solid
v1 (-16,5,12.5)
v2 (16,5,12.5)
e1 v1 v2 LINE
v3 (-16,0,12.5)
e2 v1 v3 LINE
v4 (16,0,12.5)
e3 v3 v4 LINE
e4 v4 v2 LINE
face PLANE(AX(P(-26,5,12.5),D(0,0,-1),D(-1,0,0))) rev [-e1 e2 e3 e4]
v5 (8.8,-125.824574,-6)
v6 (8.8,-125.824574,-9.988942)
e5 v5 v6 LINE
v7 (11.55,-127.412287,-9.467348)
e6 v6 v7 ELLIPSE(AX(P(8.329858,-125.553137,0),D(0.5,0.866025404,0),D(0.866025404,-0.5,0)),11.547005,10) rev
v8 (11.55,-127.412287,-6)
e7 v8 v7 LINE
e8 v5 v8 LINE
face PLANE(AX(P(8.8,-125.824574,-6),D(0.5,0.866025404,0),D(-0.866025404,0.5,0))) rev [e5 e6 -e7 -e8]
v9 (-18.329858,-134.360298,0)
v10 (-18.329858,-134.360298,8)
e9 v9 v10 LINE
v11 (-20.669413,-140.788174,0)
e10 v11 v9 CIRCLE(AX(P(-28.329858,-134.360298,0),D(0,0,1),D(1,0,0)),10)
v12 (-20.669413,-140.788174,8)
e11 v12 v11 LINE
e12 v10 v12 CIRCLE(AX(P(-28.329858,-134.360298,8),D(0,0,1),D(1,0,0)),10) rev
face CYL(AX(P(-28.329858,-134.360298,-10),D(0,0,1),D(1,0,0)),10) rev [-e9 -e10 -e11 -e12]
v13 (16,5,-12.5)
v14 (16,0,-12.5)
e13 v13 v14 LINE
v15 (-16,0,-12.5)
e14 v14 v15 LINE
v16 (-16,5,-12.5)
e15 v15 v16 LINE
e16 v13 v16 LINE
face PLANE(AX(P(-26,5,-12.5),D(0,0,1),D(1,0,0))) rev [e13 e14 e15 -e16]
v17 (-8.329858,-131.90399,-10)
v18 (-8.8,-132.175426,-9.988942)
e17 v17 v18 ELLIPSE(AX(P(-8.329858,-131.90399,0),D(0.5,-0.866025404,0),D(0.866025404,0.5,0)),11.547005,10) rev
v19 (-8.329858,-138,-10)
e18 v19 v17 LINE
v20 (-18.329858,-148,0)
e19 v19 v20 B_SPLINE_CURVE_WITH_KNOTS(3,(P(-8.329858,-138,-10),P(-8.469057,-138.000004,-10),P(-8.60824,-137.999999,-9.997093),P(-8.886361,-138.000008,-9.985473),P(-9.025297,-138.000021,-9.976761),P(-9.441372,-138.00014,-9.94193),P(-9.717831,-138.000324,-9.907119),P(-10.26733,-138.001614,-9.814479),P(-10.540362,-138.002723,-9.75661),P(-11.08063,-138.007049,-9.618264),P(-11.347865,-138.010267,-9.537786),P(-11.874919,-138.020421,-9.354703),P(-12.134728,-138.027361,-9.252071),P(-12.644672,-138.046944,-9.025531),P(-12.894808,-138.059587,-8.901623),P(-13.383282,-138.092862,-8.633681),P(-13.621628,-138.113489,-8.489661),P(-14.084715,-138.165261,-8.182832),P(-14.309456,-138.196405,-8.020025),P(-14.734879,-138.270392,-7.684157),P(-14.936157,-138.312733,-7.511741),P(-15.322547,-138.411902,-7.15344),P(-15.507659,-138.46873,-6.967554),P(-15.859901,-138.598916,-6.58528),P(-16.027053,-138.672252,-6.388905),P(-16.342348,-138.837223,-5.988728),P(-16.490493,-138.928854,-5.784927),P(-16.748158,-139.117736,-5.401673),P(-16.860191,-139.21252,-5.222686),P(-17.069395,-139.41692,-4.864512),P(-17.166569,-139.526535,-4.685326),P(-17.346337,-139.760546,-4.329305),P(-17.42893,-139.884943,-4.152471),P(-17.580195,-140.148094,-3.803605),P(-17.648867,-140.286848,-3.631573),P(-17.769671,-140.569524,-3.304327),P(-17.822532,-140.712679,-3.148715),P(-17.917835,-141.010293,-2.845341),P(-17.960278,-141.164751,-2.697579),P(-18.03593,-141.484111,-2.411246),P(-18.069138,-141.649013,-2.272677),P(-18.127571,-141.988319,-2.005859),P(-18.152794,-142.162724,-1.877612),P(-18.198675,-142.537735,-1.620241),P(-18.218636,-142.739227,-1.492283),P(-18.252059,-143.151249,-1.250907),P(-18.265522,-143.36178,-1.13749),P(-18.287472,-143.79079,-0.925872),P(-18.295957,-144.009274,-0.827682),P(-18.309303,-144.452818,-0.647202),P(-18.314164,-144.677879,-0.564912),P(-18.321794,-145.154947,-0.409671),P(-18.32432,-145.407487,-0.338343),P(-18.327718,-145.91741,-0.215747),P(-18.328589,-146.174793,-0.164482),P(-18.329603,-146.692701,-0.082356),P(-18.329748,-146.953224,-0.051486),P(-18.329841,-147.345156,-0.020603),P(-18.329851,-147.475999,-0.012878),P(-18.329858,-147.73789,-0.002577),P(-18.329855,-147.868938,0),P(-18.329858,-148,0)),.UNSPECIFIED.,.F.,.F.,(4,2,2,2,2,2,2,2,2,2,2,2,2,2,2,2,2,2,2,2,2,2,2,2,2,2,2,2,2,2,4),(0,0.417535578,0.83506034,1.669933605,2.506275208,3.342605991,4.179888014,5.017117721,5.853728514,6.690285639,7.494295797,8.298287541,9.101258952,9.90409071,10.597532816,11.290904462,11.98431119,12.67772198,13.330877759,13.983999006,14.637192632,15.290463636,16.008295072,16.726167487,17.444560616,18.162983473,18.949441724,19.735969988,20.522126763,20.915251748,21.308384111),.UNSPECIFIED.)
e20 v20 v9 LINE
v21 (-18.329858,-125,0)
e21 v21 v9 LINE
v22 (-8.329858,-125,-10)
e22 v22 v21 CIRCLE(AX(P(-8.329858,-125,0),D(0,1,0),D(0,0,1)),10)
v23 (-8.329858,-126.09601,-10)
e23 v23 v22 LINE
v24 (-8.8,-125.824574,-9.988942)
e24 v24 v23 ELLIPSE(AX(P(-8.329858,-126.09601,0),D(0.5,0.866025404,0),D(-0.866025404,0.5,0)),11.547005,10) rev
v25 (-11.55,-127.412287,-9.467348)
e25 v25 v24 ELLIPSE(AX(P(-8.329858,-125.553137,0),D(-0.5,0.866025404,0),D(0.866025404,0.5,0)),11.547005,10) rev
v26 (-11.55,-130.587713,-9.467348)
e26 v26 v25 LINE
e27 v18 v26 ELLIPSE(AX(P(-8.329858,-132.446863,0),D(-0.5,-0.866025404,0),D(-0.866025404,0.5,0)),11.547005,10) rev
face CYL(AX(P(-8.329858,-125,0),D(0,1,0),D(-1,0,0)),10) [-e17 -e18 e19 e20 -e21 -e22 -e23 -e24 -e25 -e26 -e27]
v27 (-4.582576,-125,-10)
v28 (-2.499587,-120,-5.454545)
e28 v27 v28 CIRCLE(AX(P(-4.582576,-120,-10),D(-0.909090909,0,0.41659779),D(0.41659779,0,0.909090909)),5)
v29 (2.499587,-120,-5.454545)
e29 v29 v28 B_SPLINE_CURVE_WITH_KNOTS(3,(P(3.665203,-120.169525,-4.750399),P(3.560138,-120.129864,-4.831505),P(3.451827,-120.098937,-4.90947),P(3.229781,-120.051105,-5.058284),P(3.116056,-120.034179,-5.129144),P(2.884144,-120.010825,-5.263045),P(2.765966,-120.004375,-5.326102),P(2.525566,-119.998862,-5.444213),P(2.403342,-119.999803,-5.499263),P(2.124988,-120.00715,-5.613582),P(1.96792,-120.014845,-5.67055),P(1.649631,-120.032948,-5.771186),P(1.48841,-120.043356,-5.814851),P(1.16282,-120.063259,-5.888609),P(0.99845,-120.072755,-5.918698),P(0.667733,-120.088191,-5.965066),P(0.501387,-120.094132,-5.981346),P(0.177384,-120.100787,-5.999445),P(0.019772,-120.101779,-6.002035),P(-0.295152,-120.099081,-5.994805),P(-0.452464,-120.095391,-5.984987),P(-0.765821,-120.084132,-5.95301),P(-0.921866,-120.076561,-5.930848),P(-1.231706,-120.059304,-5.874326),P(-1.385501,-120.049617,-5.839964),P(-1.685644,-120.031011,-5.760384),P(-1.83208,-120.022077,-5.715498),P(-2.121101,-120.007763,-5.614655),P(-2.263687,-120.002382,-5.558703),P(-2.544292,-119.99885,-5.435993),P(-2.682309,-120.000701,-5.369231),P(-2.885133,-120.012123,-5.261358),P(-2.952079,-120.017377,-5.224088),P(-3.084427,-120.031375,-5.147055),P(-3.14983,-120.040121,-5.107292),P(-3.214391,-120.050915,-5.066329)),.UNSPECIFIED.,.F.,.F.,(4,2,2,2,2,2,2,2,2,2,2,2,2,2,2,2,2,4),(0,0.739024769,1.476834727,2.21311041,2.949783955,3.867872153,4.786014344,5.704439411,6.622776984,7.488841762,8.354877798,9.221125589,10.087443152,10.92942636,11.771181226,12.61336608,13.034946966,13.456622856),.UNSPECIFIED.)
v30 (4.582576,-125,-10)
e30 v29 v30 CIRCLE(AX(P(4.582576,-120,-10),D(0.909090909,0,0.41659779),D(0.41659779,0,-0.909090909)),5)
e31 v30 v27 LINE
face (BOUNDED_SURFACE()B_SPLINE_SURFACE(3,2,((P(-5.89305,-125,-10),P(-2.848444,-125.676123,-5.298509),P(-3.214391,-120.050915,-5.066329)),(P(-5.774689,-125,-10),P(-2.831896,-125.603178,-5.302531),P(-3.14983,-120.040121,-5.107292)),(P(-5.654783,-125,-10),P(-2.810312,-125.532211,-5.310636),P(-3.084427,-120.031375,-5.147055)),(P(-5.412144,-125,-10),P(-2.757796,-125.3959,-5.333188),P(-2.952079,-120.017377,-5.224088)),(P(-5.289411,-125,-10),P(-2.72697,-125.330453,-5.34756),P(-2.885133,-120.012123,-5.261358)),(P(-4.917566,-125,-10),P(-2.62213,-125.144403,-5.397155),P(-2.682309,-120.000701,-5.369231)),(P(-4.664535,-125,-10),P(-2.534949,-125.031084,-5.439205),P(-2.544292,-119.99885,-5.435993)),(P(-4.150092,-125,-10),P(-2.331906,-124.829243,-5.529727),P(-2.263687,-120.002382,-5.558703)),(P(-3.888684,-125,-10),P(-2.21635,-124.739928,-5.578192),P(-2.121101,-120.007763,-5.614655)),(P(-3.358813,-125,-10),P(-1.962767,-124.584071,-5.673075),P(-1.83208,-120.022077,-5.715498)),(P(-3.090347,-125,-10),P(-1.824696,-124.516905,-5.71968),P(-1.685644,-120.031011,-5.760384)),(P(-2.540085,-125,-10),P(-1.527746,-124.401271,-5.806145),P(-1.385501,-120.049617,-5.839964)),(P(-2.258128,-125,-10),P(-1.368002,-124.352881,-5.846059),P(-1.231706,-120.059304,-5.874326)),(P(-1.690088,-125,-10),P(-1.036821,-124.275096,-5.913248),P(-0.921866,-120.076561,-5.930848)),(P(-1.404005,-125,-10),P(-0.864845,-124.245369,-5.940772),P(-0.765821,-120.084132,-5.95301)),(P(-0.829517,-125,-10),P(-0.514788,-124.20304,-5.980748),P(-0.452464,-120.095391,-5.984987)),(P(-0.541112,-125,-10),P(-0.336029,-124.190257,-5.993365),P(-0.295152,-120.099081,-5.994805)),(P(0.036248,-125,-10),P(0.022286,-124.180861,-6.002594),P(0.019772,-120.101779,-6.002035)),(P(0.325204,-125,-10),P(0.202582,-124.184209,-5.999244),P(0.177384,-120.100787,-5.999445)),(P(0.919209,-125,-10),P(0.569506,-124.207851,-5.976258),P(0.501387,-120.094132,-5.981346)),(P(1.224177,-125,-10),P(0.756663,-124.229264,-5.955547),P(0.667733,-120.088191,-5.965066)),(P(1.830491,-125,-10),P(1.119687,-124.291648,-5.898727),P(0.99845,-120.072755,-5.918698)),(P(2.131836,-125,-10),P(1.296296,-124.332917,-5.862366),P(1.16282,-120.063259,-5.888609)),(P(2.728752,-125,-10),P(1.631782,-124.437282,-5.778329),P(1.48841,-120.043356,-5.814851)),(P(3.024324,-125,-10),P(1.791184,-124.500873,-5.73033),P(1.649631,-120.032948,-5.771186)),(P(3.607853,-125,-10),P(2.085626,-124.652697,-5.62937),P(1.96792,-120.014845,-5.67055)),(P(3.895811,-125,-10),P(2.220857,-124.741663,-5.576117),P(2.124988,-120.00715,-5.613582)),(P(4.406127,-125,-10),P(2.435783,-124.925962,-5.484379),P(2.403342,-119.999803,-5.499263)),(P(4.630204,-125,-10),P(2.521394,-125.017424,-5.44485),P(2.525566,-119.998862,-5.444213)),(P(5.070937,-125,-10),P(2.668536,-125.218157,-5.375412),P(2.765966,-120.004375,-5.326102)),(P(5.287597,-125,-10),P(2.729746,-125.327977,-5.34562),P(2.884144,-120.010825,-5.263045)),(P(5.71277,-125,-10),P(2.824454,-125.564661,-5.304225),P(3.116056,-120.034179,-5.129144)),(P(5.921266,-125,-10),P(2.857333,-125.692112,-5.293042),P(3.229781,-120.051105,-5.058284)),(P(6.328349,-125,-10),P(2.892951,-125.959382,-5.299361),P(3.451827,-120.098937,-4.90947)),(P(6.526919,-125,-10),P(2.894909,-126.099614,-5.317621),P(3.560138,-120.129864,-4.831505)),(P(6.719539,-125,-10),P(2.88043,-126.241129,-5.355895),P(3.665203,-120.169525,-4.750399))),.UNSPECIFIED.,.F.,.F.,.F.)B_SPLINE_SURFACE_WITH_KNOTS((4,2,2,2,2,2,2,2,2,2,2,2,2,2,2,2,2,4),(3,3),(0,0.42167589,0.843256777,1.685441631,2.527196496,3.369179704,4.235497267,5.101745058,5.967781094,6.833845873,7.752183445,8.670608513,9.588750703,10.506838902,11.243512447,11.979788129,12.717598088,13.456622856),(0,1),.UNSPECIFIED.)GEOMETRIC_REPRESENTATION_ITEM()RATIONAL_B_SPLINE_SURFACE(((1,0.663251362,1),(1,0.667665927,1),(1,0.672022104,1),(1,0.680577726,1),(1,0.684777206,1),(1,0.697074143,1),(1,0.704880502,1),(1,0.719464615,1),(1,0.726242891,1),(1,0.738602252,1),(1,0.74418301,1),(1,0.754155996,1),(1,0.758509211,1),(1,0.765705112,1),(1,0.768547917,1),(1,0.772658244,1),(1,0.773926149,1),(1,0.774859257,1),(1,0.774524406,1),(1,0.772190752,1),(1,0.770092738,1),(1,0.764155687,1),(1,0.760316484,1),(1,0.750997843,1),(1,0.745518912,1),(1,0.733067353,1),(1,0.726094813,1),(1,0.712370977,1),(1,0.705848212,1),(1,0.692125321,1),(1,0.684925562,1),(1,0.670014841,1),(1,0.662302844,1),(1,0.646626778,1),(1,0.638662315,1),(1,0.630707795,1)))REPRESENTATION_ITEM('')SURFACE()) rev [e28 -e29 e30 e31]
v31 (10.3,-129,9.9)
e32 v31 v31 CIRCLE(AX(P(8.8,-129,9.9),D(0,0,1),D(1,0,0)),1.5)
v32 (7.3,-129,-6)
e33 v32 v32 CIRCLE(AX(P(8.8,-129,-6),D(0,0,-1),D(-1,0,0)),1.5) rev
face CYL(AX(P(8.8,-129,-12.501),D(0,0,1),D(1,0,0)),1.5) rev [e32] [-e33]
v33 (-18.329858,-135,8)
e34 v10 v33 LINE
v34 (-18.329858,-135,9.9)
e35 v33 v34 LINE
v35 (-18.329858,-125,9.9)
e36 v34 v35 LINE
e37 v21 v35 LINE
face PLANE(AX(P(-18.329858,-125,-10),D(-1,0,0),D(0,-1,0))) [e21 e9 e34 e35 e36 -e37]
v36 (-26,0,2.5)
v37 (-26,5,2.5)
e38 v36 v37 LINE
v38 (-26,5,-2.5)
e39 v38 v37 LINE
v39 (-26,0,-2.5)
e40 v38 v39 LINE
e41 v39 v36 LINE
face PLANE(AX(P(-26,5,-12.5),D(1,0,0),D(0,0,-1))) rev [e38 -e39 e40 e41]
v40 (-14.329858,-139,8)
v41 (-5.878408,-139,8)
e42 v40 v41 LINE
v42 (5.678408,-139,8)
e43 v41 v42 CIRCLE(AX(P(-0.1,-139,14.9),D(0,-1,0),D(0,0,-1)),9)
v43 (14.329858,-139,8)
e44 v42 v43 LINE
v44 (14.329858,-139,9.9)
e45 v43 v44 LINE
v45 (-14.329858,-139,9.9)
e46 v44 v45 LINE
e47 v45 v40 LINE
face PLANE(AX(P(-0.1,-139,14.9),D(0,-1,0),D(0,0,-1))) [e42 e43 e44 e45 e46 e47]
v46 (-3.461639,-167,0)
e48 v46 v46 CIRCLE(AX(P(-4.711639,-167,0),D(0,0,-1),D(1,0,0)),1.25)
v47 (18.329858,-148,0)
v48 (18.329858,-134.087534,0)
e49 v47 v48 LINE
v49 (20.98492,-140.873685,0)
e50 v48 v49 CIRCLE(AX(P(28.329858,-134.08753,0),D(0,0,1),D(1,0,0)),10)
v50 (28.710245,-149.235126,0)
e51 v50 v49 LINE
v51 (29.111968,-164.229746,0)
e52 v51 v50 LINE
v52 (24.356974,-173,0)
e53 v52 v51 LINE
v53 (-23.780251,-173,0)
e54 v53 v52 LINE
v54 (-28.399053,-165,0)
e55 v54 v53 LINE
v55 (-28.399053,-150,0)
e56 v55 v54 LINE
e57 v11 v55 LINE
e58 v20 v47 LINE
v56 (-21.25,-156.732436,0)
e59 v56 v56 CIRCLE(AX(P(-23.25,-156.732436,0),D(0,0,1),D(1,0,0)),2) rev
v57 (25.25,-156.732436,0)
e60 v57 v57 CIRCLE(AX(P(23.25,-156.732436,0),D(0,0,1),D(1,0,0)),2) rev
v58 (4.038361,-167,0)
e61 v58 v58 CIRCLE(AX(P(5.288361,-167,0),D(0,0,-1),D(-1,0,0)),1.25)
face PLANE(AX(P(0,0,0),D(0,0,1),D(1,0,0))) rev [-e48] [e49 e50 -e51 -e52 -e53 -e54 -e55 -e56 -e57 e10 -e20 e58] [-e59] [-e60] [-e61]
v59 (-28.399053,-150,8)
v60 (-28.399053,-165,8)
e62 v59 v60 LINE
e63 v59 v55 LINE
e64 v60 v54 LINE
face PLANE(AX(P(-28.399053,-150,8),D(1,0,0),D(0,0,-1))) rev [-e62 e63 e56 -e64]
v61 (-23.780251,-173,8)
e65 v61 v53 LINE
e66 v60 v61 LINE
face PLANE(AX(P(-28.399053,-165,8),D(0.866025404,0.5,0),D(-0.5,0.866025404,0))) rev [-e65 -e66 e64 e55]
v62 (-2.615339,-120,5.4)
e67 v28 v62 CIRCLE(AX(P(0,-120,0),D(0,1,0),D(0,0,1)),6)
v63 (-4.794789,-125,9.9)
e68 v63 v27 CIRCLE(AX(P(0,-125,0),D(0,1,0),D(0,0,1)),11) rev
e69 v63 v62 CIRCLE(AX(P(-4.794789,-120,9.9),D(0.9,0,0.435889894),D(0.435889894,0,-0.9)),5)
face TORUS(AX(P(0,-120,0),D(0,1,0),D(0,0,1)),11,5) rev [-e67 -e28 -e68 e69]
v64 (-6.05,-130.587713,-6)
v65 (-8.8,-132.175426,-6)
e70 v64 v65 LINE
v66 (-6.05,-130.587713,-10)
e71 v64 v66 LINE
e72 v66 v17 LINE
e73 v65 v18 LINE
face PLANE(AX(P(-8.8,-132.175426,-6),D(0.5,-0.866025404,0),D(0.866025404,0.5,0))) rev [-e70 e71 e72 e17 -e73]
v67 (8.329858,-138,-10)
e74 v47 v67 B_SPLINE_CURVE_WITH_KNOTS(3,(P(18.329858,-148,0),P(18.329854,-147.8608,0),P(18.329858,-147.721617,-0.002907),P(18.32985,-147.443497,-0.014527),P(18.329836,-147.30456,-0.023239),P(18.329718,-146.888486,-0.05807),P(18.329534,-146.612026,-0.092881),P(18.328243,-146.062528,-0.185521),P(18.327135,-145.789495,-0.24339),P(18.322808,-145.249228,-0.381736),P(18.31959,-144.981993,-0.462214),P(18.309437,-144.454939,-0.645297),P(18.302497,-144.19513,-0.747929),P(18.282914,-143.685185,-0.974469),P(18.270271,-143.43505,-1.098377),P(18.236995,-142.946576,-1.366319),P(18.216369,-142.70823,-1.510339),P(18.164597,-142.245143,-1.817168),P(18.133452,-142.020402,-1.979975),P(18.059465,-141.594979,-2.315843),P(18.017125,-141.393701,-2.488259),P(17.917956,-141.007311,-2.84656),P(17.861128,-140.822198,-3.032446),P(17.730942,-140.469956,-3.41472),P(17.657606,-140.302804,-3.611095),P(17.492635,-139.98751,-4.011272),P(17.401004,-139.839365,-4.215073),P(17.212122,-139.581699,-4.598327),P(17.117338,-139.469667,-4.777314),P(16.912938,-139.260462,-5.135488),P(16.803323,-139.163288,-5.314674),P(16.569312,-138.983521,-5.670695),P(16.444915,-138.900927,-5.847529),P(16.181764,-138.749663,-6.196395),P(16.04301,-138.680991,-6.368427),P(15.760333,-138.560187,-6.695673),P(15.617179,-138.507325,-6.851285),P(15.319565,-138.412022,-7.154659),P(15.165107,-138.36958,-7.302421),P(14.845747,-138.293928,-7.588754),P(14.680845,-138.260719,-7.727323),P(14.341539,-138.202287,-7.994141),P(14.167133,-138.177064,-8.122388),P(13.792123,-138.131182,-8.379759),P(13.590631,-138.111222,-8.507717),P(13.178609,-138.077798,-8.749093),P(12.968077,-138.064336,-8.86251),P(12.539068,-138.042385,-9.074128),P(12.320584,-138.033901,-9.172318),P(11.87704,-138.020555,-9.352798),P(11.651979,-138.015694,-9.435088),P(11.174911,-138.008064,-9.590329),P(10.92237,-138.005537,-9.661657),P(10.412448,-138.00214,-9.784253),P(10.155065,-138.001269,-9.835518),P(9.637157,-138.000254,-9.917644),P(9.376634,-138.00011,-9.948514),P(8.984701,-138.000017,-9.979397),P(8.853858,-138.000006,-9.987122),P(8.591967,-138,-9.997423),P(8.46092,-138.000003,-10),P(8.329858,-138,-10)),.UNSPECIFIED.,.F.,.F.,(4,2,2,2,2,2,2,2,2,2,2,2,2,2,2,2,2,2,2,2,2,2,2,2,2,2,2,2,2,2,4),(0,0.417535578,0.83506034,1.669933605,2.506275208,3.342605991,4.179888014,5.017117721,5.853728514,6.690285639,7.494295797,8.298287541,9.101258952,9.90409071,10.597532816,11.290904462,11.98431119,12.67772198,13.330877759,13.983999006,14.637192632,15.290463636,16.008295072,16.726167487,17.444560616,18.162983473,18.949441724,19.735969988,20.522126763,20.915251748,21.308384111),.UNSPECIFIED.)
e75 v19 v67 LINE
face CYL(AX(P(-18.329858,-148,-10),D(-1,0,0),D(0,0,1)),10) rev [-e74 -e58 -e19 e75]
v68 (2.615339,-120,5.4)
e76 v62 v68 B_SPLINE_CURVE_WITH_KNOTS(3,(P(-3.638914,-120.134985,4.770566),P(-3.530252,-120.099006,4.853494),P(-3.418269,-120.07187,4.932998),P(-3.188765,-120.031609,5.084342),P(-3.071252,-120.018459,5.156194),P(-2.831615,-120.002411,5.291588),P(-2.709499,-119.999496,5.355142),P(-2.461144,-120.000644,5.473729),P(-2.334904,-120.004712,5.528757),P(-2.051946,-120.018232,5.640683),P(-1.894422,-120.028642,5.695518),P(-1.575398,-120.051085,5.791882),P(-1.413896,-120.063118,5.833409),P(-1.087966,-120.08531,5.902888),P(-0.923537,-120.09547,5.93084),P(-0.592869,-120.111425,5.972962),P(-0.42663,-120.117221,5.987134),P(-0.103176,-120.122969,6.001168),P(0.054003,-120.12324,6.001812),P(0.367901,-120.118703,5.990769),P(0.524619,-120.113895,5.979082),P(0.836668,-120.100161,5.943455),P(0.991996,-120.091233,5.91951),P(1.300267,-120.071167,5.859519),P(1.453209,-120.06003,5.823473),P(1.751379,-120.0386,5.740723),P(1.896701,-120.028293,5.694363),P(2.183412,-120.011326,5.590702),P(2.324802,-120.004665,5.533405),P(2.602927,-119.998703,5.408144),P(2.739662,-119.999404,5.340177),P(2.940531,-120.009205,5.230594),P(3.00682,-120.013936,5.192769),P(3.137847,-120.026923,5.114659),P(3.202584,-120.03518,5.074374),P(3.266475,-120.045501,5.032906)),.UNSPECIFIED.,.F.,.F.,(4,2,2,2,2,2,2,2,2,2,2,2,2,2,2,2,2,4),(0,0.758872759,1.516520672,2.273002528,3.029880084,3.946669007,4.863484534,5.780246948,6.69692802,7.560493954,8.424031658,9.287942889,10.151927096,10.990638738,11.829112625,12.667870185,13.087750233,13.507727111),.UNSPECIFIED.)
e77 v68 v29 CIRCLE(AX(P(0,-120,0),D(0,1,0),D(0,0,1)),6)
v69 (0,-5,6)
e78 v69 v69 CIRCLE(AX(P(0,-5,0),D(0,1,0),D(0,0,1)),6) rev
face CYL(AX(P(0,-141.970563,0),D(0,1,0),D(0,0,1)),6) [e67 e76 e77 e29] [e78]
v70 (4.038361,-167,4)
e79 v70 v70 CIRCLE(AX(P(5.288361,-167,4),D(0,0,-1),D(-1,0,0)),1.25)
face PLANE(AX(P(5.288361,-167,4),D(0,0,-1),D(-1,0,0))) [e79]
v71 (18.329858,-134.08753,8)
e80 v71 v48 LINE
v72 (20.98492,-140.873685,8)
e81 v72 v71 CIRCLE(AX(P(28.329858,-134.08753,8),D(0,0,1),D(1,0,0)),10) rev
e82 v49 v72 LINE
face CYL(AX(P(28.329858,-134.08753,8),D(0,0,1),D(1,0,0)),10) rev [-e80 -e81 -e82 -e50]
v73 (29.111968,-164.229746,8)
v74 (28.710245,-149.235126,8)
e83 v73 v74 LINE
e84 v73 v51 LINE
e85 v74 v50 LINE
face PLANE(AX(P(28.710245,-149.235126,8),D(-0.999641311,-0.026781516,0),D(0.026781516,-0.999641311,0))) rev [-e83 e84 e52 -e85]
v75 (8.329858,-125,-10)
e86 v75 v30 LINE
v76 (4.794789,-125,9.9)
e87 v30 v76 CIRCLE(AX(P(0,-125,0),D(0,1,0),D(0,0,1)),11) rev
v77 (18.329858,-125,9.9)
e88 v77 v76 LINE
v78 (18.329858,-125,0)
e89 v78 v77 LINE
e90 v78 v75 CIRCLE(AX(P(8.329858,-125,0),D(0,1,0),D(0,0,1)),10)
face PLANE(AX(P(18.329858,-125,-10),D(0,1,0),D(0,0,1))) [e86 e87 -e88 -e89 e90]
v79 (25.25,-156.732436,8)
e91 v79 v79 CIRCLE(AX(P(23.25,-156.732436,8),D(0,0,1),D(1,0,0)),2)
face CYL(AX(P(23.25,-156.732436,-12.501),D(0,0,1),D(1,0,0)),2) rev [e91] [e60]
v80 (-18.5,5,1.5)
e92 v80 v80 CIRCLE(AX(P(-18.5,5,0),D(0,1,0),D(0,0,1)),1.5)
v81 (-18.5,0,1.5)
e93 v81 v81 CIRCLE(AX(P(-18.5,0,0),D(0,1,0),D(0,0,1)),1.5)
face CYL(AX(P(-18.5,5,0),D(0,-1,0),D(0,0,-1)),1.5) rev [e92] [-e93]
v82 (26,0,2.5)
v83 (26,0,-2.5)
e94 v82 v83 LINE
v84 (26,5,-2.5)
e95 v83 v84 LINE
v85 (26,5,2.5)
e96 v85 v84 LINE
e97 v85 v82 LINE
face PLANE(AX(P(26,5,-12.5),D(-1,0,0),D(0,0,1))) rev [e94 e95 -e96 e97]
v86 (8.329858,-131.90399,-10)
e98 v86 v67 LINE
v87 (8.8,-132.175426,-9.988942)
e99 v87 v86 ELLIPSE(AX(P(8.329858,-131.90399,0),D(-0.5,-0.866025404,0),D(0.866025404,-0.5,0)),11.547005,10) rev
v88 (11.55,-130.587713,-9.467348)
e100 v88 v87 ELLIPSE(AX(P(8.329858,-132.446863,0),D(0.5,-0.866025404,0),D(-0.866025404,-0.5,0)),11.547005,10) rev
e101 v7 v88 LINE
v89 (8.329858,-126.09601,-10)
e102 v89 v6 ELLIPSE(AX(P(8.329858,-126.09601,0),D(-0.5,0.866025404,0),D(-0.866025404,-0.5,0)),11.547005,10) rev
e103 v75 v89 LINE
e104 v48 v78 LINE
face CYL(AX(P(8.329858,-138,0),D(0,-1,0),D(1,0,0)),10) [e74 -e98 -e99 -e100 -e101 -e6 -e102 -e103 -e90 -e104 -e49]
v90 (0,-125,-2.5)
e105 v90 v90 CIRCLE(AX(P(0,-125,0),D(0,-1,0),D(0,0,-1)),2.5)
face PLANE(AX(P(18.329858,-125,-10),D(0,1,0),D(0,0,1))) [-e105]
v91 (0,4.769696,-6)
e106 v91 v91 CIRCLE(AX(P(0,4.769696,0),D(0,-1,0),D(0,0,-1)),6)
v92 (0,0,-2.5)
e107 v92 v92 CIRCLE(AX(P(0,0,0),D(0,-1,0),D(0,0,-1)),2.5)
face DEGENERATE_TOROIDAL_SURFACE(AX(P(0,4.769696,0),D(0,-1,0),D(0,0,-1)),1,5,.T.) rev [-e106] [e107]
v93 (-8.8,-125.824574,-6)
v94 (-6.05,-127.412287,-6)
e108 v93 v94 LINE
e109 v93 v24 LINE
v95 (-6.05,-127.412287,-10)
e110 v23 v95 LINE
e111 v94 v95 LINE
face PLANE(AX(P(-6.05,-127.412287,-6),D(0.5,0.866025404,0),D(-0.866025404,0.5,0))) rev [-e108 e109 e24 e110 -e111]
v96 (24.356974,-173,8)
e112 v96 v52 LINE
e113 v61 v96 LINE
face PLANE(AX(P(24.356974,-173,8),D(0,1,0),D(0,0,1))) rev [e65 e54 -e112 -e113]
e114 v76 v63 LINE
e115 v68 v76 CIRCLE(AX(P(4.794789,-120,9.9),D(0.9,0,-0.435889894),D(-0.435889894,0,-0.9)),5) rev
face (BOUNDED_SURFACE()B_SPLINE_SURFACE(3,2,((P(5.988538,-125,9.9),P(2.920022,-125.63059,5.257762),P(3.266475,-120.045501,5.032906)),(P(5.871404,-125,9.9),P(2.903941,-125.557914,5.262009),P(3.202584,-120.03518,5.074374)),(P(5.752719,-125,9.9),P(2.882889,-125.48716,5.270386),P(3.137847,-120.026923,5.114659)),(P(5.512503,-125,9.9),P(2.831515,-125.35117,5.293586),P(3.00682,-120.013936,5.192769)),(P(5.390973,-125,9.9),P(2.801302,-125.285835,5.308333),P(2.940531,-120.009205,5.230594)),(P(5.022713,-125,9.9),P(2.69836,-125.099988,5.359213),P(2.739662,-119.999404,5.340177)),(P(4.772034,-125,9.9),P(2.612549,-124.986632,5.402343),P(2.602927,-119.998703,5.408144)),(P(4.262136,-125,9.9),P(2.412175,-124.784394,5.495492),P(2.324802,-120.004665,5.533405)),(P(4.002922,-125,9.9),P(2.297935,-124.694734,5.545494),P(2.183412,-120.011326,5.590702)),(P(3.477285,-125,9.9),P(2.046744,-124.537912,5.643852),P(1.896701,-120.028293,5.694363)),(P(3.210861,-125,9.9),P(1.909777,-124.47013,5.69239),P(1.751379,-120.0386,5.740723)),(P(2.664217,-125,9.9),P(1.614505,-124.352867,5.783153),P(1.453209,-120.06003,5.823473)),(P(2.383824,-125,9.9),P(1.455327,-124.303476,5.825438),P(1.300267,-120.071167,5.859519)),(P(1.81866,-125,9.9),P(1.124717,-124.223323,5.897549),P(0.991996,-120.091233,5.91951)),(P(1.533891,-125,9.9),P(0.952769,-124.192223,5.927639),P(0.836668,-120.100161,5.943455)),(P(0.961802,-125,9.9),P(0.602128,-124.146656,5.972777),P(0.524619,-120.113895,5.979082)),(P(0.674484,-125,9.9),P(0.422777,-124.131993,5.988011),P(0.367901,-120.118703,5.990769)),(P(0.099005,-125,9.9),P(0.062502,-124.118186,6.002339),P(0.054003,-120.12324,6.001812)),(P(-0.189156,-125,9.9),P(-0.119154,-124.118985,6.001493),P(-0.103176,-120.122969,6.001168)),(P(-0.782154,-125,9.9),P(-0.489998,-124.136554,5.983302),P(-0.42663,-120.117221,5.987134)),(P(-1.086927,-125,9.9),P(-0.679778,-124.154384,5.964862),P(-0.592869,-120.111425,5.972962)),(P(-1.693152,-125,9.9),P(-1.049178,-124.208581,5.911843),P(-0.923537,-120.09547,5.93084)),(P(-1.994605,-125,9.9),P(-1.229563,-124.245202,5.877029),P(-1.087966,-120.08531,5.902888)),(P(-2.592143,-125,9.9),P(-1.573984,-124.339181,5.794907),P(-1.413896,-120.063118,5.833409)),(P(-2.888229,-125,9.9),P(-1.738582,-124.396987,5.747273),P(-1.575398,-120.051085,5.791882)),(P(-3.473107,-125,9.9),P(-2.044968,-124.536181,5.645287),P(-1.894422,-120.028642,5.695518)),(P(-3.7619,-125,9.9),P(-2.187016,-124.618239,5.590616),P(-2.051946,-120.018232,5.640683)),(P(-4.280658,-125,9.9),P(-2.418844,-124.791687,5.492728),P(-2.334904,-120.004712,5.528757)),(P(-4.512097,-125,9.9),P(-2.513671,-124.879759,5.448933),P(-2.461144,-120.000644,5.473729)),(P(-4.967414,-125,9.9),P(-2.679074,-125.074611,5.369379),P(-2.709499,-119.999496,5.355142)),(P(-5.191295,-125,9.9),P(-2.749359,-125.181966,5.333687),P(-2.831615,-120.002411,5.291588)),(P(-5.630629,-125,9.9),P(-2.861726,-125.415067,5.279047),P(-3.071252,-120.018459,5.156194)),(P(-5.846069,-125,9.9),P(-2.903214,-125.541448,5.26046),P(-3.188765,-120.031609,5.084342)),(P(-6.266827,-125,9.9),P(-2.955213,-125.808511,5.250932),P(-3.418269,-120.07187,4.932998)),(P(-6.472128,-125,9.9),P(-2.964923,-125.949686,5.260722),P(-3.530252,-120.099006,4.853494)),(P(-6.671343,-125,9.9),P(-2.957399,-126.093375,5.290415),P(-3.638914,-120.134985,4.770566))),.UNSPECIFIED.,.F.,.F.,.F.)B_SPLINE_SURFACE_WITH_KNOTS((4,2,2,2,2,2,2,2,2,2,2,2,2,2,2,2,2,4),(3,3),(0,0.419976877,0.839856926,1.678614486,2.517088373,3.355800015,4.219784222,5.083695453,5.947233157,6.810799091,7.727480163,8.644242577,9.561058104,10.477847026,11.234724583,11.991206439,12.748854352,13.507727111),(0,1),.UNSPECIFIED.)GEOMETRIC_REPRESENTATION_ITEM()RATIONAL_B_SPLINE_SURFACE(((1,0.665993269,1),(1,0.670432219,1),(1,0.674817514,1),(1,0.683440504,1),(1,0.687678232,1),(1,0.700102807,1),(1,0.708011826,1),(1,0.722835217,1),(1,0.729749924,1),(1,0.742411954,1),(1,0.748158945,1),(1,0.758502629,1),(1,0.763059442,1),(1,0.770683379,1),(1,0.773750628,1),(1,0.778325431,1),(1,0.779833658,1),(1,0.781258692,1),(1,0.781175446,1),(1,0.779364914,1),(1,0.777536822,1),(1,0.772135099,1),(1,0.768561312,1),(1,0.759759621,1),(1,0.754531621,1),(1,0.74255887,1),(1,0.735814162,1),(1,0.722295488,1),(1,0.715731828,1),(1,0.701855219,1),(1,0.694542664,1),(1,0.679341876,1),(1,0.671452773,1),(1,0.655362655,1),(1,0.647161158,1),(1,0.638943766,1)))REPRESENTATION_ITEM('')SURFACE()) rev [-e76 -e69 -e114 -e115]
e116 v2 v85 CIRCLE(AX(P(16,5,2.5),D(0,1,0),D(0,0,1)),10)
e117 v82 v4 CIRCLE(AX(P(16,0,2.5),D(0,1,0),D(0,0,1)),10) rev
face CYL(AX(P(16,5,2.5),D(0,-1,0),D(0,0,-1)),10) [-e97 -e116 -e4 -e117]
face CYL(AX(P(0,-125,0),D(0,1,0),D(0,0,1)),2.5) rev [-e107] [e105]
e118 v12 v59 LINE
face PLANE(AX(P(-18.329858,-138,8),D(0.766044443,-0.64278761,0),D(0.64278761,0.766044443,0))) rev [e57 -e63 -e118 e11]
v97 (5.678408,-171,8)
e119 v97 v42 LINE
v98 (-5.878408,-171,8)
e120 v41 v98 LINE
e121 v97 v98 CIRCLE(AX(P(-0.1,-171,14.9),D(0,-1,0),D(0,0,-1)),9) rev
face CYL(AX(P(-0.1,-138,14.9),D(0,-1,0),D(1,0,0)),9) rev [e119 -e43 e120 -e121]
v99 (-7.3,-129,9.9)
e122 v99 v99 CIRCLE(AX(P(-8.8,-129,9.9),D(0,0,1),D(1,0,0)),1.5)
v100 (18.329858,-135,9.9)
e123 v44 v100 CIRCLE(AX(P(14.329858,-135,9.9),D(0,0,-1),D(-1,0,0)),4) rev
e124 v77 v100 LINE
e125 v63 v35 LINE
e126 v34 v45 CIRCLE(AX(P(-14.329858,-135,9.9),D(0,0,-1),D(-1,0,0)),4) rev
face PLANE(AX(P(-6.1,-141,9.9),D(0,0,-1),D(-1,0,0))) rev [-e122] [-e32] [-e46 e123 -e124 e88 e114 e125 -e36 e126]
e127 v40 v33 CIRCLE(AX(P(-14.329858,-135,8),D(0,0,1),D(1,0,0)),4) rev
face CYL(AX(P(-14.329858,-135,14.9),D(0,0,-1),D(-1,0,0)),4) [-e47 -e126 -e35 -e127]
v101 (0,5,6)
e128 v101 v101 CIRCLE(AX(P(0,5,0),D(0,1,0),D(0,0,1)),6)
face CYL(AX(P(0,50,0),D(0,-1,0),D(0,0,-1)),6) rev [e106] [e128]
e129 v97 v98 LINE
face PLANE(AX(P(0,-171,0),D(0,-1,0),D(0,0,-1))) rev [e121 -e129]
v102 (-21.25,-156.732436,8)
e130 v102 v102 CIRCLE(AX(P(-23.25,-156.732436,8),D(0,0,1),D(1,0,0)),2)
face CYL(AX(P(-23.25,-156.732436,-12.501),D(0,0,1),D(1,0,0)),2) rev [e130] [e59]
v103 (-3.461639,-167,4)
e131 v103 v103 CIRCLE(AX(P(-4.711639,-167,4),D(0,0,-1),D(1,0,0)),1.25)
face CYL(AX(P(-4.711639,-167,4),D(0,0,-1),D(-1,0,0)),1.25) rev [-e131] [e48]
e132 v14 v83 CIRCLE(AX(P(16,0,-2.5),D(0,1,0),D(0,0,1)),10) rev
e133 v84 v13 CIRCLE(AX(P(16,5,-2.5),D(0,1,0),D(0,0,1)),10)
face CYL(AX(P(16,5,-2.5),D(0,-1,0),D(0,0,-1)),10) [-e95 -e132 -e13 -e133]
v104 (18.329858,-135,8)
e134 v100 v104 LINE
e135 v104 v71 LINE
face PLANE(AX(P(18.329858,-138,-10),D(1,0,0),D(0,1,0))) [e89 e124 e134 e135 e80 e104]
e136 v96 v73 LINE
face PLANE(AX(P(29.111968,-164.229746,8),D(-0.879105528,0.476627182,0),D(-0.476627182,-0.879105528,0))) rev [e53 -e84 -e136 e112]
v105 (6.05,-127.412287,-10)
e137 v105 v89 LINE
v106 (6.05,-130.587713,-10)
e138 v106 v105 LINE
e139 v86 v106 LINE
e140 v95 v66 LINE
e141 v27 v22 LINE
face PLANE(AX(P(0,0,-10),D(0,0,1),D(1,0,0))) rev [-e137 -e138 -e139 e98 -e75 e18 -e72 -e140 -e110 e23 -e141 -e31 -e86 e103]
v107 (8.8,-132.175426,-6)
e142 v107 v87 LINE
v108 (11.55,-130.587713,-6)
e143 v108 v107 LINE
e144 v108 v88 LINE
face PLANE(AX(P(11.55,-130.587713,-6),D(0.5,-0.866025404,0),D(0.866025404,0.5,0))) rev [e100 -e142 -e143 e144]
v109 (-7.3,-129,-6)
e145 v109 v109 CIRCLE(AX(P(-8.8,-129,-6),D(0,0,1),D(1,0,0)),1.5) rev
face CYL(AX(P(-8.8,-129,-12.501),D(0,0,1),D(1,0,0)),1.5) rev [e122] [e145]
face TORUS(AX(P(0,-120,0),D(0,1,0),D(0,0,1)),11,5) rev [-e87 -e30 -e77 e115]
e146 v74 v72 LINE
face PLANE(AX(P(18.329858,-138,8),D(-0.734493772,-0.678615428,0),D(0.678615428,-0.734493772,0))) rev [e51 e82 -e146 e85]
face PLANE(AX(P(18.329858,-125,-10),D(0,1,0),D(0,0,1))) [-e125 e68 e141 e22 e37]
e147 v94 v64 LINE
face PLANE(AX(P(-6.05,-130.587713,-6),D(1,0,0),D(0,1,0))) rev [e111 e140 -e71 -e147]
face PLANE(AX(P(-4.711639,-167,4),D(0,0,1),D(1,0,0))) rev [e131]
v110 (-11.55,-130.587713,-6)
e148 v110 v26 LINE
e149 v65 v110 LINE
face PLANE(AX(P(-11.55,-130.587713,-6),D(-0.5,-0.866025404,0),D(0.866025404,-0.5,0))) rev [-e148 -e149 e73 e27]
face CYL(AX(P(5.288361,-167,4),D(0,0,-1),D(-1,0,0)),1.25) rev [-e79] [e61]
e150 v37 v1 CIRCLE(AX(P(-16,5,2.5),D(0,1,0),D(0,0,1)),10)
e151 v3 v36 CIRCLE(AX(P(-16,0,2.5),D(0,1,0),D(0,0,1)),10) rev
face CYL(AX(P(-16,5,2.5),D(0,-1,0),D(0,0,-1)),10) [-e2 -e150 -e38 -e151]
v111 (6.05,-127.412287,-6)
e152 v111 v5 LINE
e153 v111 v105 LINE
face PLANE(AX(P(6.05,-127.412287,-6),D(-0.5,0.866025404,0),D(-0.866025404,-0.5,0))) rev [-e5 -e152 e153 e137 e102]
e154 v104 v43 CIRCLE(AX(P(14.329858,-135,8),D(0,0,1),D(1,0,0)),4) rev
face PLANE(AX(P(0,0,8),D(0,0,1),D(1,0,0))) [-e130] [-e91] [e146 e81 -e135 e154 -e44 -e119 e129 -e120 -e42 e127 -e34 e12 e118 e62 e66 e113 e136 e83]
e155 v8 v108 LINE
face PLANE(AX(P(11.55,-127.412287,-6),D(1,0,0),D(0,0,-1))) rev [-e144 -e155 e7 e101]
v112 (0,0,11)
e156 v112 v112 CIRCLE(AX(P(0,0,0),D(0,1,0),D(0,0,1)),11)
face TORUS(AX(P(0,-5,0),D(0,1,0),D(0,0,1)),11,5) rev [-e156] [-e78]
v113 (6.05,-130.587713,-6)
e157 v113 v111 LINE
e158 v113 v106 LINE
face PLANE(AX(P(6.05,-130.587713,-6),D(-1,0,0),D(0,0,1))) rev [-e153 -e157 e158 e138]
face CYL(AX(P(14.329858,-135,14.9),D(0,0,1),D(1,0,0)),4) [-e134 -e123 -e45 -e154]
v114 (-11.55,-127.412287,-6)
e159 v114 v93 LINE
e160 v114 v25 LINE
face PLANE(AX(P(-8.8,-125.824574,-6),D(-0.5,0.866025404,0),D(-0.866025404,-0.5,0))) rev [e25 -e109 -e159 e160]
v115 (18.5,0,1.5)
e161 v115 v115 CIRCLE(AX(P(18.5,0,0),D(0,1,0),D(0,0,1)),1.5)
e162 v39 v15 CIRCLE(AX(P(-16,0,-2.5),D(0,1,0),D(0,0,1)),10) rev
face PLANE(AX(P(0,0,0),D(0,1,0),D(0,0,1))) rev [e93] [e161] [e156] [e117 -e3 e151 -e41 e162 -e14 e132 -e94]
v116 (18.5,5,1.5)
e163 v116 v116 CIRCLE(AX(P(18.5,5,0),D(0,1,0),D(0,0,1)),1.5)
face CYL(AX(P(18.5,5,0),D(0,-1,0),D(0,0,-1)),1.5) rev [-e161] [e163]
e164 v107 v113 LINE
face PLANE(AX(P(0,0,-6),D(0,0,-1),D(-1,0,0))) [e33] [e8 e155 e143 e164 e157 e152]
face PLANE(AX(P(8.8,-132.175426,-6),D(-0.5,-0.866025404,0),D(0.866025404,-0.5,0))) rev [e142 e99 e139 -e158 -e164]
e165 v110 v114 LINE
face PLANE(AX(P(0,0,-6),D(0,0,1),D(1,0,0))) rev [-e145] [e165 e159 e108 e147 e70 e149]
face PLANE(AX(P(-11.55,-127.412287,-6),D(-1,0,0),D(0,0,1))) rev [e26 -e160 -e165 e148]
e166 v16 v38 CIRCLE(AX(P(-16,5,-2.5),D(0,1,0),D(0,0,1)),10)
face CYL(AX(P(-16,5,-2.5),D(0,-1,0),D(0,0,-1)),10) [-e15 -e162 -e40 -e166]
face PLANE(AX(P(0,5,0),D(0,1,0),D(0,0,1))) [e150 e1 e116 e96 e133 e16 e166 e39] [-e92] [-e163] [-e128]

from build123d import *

# Parameters (mm, degrees)
SKETCH_1_W           = 52
SKETCH_1_H           = 25
SKETCH_1_R           = 1.5
EXTRUDE_1_DEPTH      = 5
SKETCH_2_R           = 4
SKETCH_2_R_2         = 2.5
EXTRUDE_2_DEPTH      = 125
FILLET_1_R           = 10
SKETCH_2_3_R         = 6
SKETCH_2_3_R_2       = 4
EXTRUDE_4_DEPTH      = 125
FILLET_3_R           = 5
CUT_EXTRUDE_START    = -50
SKETCH_2_4_R         = 6
CUT_EXTRUDE_1_DEPTH  = 50
FILLET_4_R           = 5
EXTRUDE_5_DEPTH      = 23
EXTRUDE_5_DEPTH_BACK = 10
SKETCH_3_W           = 36.659715442
SKETCH_3_H           = 13
SKETCH_4_W           = 12.2
SKETCH_4_H           = 10.2
CUT_EXTRUDE_2_DEPTH  = 16
FILLET_5_R           = 10
EXTRUDE_6_DEPTH      = 8
FILLET_7_R           = 10
FILLET_8_R           = 10
SKETCH_9_R           = 9
SKETCH_9_R_2         = 2.5
CUT_EXTRUDE_4_DEPTH  = 35
SKETCH_10_W          = 48.137224848
SKETCH_10_H          = 8
EXTRUDE_9_DEPTH      = 2
FILLET_9_R           = 5
CUT_EXTRUDE_5_REACH  = 178.626
SKETCH_8_R           = 2
CUT_EXTRUDE_6_REACH  = 149.735
SKETCH_11_W          = 37.875915136
SKETCH_11_H          = 13.1
EXTRUDE_START        = 1
EXTRUDE_10_DEPTH     = 1
CUT_EXTRUDE_7_REACH  = 178.857
SKETCH_13_R          = 1.5
CUT_EXTRUDE_8_DEPTH  = 4
FILLET_11_R          = 4
SKETCH_16_R          = 1.25
CUT_EXTRUDE_10_DEPTH = 4


# Some blends are built 0.0001 mm under size
with BuildPart() as part:
    # 草图1 → 凸台-拉伸1 (new body)
    with BuildSketch(Plane(origin=(0, 0, 0), x_dir=(1, 0, 0), z_dir=(0, 1, 0))):
        Rectangle(SKETCH_1_W, SKETCH_1_H)
        with Locations(Location((-18.5, 0, 0), (0, 0, 270))):
            Circle(SKETCH_1_R, mode=Mode.SUBTRACT)
        with Locations(Location((18.5, 0, 0), (0, 0, 270))):
            Circle(SKETCH_1_R, mode=Mode.SUBTRACT)
    extrude(amount=EXTRUDE_1_DEPTH)

    # 草图2 → 凸台-拉伸2 (add)
    with BuildSketch(Plane.XZ):
        with Locations(Location((0, 0, 0), (0, 0, 90))):
            Circle(SKETCH_2_R)
        with Locations(Location((0, 0, 0), (0, 0, 270))):
            Circle(SKETCH_2_R_2, mode=Mode.SUBTRACT)
    extrude(amount=EXTRUDE_2_DEPTH)

    # 圆角1
    fillet_1_edges = [part.edges().sort_by_distance(p)[0] for p in [
        (26, 2.5, 12.5),
        (-26, 2.5, 12.5),
        (-26, 2.5, -12.5),
        (26, 2.5, -12.5),
    ]]
    fillet(fillet_1_edges, radius=FILLET_1_R)

    # 草图2<3> → 凸台-拉伸4 (add)
    with BuildSketch(Plane.XZ):
        with Locations(Location((0, 0, 0), (0, 0, 90))):
            Circle(SKETCH_2_3_R)
        Circle(SKETCH_2_3_R_2, mode=Mode.SUBTRACT)
    extrude(amount=EXTRUDE_4_DEPTH)

    # 圆角3
    fillet_3_edges = [part.edges().sort_by_distance(p)[0] for p in [
        (0, 0, -6),
    ]]
    fillet(fillet_3_edges, radius=FILLET_3_R)

    # 草图2<4> → 切除-拉伸1 (cut)
    with BuildSketch(Plane.XZ.offset(CUT_EXTRUDE_START)):
        with Locations(Location((0, 0, 0), (0, 0, 90))):
            Circle(SKETCH_2_4_R)
    extrude(amount=CUT_EXTRUDE_1_DEPTH, mode=Mode.SUBTRACT)

    # 圆角4
    # the kernel refuses this fillet: 5 mm, written as the material it adds along each edge
    with BuildSketch(Plane(origin=(0, 0, 0), x_dir=(0, 0, 1), z_dir=(1, 0, 0))) as fillet_4_piece_1:
        with BuildLine():
            CenterArc((1, -4.769696007), FILLET_4_R, 0, 72.542396876)
            Line((2.5, 0), (2.53, 0.09539392))
            ThreePointArc((2.53, 0.09539392), (4.25, 0.1), (6, 0.1))
            Line((6, 0.1), (6.1, 0))
            Line((6.1, 0), (6.1, -4.769696007))
            Line((6.1, -4.769696007), (6, -4.769696007))
        make_face()
    revolve(axis=Axis((0, 0, 0), (0, -1, 0)))

    # 草图3 → 凸台-拉伸5 (add, two sides: drawn at the far end of the back side and taken through both)
    with BuildSketch(Plane.XY.offset(-EXTRUDE_5_DEPTH_BACK)):
        with Locations((0, -131.5)):
            Rectangle(SKETCH_3_W, SKETCH_3_H)
    extrude(amount=EXTRUDE_5_DEPTH + EXTRUDE_5_DEPTH_BACK)

    # 草图4 → 切除-拉伸2 (cut)
    with BuildSketch(Plane(origin=(0, -125, 0), x_dir=(1, 0, 0), z_dir=(0, 1, 0))):
        with Locations((0, -15)):
            Rectangle(SKETCH_4_W, SKETCH_4_H)
    extrude(amount=-CUT_EXTRUDE_2_DEPTH, mode=Mode.SUBTRACT)

    # 圆角5
    fillet_5_edges = [part.edges().sort_by_distance(p)[0] for p in [
        (18.329857721, -131.5, -10),
        (-18.329857721, -131.5, -10),
        (18.329857721, -131.5, 23),
        (-18.329857721, -131.5, 23),
    ]]
    fillet(fillet_5_edges, radius=FILLET_5_R)

    # 草图5 → 凸台-拉伸6 (add)
    with BuildSketch(Plane.XY):
        Polygon((-18.329857721, -138), (-28.399053295, -150), (-28.399053295, -165), (-23.780251142, -173), (0.468760608, -173), (24.356973706, -173), (29.111967808, -164.22974568), (28.710245061, -149.235126017), (18.329857721, -138), align=None)
    extrude(amount=EXTRUDE_6_DEPTH)

    # 圆角7
    # the kernel refuses this fillet: 10 mm, written as the material it adds along each edge
    with BuildSketch(Plane(origin=(18.329857721, -138, 8), x_dir=(0, 1, 0), z_dir=(0, 0, -1))) as fillet_7_piece_1:
        with BuildLine():
            CenterArc((FILLET_7_R * 0.39124696726, FILLET_7_R), FILLET_7_R, 227.264457783, 42.735542217)
            Line((-FILLET_7_R * 0.287368460715, FILLET_7_R * 0.265506228132), (0, 0))
            Line((0, 0), (FILLET_7_R * 0.39124696726, 0))
        make_face()
    extrude(amount=8)
    with BuildSketch(Plane(origin=(-18.329857721, -138, 0), x_dir=(0, 1, 0), z_dir=(0, 0, 1))) as fillet_7_piece_2:
        with BuildLine():
            CenterArc((FILLET_7_R * 0.363970234266, FILLET_7_R), FILLET_7_R, 230, 40)
            Line((-FILLET_7_R * 0.27881737542, FILLET_7_R * 0.233955556881), (0, 0))
            Line((0, 0), (FILLET_7_R * 0.363970234266, 0))
        make_face()
    extrude(amount=8)

    # 圆角8
    fillet_8_edges = [part.edges().sort_by_distance(p)[0] for p in [
        (0, -138, 0),
    ]]
    fillet(fillet_8_edges, radius=FILLET_8_R - 0.0001)  # a hair under: the kernel refuses the full size

    # 草图9 → 切除-拉伸4 (cut)
    with BuildSketch(Plane.XZ.offset(173)):
        with Locations((-0.1, 14.9)):
            Circle(SKETCH_9_R)
        with Locations((-0.1, 14.9)):
            Circle(SKETCH_9_R_2, mode=Mode.SUBTRACT)
    extrude(amount=-CUT_EXTRUDE_4_DEPTH, mode=Mode.SUBTRACT)

    # 草图10 → 凸台-拉伸9 (add)
    with BuildSketch(Plane.XZ.offset(173)):
        with Locations((0.288361282, 4)):
            Rectangle(SKETCH_10_W, SKETCH_10_H)
    extrude(amount=-EXTRUDE_9_DEPTH)

    # 圆角9
    fillet_9_edges = [part.edges().sort_by_distance(p)[0] for p in [
        (0, -125, -6),
    ]]
    fillet(fillet_9_edges, radius=FILLET_9_R)

    # 草图8 → 切除-拉伸5 (cut, up to next)
    with BuildSketch(Plane.XY.offset(8), mode=Mode.PRIVATE) as cut_extrude_5_sk1:
        with Locations((23.25, -156.732435849)):
            Circle(SKETCH_8_R)
    cut_extrude_5_tool1 = extrude(cut_extrude_5_sk1.sketch, amount=-CUT_EXTRUDE_5_REACH, mode=Mode.PRIVATE) & part.part
    # 草图8 → 切除-拉伸5 (cut, up to next)
    with BuildSketch(Plane.XY.offset(8), mode=Mode.PRIVATE) as cut_extrude_5_sk2:
        with Locations((-23.25, -156.732435849)):
            Circle(SKETCH_8_R)
    cut_extrude_5_tool2 = extrude(cut_extrude_5_sk2.sketch, amount=-CUT_EXTRUDE_5_REACH, mode=Mode.PRIVATE) & part.part
    add(cut_extrude_5_tool1.solids().sort_by_distance((23.25, -156.732436, 8))[0], mode=Mode.SUBTRACT)
    add(cut_extrude_5_tool2.solids().sort_by_distance((-23.25, -156.732436, 8))[0], mode=Mode.SUBTRACT)

    # 草图11 → 切除-拉伸6 (cut, up to next)
    with BuildSketch(Plane.XZ.offset(138), mode=Mode.PRIVATE) as cut_extrude_6_sk1:
        with Locations((-0.053616604, 16.45)):
            Rectangle(SKETCH_11_W, SKETCH_11_H)
    cut_extrude_6_tool1 = extrude(cut_extrude_6_sk1.sketch, amount=-CUT_EXTRUDE_6_REACH, mode=Mode.PRIVATE) & part.part
    add(cut_extrude_6_tool1.solids().sort_by_distance((-0.053617, -138, 16.45))[0], mode=Mode.SUBTRACT)

    # 草图12 → 凸台-拉伸10 (add)
    with BuildSketch(Plane.XZ.offset(138).offset(EXTRUDE_START)):
        with BuildLine():
            Line((18.329857721, 9.9), (-18.329857721, 9.9))
            Line((-18.329857721, 9.9), (-18.329857721, 8))
            Line((-18.329857721, 8), (-5.878408085, 8))
            ThreePointArc((-5.878408085, 8), (-0.1, 5.9), (5.678408085, 8))
            Line((5.678408085, 8), (18.329857721, 8))
            Line((18.329857721, 8), (18.329857721, 9.9))
        make_face()
    extrude(amount=-EXTRUDE_10_DEPTH)

    # 草图13 → 切除-拉伸7 (cut, up to next)
    with BuildSketch(Plane.XY.offset(9.9), mode=Mode.PRIVATE) as cut_extrude_7_sk1:
        with Locations((-8.8, -129)):
            Circle(SKETCH_13_R)
    cut_extrude_7_tool1 = extrude(cut_extrude_7_sk1.sketch, amount=-CUT_EXTRUDE_7_REACH, mode=Mode.PRIVATE) & part.part
    # 草图13 → 切除-拉伸7 (cut, up to next)
    with BuildSketch(Plane.XY.offset(9.9), mode=Mode.PRIVATE) as cut_extrude_7_sk2:
        with Locations((8.8, -129)):
            Circle(SKETCH_13_R)
    cut_extrude_7_tool2 = extrude(cut_extrude_7_sk2.sketch, amount=-CUT_EXTRUDE_7_REACH, mode=Mode.PRIVATE) & part.part
    add(cut_extrude_7_tool1.solids().sort_by_distance((-8.8, -129, 9.9))[0], mode=Mode.SUBTRACT)
    add(cut_extrude_7_tool2.solids().sort_by_distance((8.8, -129, 9.9))[0], mode=Mode.SUBTRACT)

    # 草图14 → 切除-拉伸8 (cut)
    with BuildSketch(Plane(origin=(0, 0, -10), x_dir=(-1, 0, 0), z_dir=(0, 0, -1))):
        Polygon((-6.05, -130.58771324), (-6.05, -127.41228676), (-8.8, -125.824573519), (-11.55, -127.41228676), (-11.55, -130.58771324), (-8.8, -132.175426481), align=None)
        Polygon((6.05, -130.58771324), (6.05, -127.41228676), (8.8, -125.824573519), (11.55, -127.41228676), (11.55, -130.58771324), (8.8, -132.175426481), align=None)
    extrude(amount=-CUT_EXTRUDE_8_DEPTH, mode=Mode.SUBTRACT)

    # 圆角11
    fillet_11_edges = [part.edges().sort_by_distance(p)[0] for p in [
        (18.329857721, -139, 8.95),
        (-18.329857721, -139, 8.95),
    ]]
    fillet(fillet_11_edges, radius=FILLET_11_R)

    # 草图16 → 切除-拉伸10 (cut)
    with BuildSketch(Plane(origin=(0, 0, 0), x_dir=(-1, 0, 0), z_dir=(0, 0, -1))):
        with Locations((-5.288361282, -167)):
            Circle(SKETCH_16_R)
        with Locations(Location((4.711638718, -167, 0), (0, 0, 180))):
            Circle(SKETCH_16_R)
    extrude(amount=-CUT_EXTRUDE_10_DEPTH, mode=Mode.SUBTRACT)


solid = part.part
